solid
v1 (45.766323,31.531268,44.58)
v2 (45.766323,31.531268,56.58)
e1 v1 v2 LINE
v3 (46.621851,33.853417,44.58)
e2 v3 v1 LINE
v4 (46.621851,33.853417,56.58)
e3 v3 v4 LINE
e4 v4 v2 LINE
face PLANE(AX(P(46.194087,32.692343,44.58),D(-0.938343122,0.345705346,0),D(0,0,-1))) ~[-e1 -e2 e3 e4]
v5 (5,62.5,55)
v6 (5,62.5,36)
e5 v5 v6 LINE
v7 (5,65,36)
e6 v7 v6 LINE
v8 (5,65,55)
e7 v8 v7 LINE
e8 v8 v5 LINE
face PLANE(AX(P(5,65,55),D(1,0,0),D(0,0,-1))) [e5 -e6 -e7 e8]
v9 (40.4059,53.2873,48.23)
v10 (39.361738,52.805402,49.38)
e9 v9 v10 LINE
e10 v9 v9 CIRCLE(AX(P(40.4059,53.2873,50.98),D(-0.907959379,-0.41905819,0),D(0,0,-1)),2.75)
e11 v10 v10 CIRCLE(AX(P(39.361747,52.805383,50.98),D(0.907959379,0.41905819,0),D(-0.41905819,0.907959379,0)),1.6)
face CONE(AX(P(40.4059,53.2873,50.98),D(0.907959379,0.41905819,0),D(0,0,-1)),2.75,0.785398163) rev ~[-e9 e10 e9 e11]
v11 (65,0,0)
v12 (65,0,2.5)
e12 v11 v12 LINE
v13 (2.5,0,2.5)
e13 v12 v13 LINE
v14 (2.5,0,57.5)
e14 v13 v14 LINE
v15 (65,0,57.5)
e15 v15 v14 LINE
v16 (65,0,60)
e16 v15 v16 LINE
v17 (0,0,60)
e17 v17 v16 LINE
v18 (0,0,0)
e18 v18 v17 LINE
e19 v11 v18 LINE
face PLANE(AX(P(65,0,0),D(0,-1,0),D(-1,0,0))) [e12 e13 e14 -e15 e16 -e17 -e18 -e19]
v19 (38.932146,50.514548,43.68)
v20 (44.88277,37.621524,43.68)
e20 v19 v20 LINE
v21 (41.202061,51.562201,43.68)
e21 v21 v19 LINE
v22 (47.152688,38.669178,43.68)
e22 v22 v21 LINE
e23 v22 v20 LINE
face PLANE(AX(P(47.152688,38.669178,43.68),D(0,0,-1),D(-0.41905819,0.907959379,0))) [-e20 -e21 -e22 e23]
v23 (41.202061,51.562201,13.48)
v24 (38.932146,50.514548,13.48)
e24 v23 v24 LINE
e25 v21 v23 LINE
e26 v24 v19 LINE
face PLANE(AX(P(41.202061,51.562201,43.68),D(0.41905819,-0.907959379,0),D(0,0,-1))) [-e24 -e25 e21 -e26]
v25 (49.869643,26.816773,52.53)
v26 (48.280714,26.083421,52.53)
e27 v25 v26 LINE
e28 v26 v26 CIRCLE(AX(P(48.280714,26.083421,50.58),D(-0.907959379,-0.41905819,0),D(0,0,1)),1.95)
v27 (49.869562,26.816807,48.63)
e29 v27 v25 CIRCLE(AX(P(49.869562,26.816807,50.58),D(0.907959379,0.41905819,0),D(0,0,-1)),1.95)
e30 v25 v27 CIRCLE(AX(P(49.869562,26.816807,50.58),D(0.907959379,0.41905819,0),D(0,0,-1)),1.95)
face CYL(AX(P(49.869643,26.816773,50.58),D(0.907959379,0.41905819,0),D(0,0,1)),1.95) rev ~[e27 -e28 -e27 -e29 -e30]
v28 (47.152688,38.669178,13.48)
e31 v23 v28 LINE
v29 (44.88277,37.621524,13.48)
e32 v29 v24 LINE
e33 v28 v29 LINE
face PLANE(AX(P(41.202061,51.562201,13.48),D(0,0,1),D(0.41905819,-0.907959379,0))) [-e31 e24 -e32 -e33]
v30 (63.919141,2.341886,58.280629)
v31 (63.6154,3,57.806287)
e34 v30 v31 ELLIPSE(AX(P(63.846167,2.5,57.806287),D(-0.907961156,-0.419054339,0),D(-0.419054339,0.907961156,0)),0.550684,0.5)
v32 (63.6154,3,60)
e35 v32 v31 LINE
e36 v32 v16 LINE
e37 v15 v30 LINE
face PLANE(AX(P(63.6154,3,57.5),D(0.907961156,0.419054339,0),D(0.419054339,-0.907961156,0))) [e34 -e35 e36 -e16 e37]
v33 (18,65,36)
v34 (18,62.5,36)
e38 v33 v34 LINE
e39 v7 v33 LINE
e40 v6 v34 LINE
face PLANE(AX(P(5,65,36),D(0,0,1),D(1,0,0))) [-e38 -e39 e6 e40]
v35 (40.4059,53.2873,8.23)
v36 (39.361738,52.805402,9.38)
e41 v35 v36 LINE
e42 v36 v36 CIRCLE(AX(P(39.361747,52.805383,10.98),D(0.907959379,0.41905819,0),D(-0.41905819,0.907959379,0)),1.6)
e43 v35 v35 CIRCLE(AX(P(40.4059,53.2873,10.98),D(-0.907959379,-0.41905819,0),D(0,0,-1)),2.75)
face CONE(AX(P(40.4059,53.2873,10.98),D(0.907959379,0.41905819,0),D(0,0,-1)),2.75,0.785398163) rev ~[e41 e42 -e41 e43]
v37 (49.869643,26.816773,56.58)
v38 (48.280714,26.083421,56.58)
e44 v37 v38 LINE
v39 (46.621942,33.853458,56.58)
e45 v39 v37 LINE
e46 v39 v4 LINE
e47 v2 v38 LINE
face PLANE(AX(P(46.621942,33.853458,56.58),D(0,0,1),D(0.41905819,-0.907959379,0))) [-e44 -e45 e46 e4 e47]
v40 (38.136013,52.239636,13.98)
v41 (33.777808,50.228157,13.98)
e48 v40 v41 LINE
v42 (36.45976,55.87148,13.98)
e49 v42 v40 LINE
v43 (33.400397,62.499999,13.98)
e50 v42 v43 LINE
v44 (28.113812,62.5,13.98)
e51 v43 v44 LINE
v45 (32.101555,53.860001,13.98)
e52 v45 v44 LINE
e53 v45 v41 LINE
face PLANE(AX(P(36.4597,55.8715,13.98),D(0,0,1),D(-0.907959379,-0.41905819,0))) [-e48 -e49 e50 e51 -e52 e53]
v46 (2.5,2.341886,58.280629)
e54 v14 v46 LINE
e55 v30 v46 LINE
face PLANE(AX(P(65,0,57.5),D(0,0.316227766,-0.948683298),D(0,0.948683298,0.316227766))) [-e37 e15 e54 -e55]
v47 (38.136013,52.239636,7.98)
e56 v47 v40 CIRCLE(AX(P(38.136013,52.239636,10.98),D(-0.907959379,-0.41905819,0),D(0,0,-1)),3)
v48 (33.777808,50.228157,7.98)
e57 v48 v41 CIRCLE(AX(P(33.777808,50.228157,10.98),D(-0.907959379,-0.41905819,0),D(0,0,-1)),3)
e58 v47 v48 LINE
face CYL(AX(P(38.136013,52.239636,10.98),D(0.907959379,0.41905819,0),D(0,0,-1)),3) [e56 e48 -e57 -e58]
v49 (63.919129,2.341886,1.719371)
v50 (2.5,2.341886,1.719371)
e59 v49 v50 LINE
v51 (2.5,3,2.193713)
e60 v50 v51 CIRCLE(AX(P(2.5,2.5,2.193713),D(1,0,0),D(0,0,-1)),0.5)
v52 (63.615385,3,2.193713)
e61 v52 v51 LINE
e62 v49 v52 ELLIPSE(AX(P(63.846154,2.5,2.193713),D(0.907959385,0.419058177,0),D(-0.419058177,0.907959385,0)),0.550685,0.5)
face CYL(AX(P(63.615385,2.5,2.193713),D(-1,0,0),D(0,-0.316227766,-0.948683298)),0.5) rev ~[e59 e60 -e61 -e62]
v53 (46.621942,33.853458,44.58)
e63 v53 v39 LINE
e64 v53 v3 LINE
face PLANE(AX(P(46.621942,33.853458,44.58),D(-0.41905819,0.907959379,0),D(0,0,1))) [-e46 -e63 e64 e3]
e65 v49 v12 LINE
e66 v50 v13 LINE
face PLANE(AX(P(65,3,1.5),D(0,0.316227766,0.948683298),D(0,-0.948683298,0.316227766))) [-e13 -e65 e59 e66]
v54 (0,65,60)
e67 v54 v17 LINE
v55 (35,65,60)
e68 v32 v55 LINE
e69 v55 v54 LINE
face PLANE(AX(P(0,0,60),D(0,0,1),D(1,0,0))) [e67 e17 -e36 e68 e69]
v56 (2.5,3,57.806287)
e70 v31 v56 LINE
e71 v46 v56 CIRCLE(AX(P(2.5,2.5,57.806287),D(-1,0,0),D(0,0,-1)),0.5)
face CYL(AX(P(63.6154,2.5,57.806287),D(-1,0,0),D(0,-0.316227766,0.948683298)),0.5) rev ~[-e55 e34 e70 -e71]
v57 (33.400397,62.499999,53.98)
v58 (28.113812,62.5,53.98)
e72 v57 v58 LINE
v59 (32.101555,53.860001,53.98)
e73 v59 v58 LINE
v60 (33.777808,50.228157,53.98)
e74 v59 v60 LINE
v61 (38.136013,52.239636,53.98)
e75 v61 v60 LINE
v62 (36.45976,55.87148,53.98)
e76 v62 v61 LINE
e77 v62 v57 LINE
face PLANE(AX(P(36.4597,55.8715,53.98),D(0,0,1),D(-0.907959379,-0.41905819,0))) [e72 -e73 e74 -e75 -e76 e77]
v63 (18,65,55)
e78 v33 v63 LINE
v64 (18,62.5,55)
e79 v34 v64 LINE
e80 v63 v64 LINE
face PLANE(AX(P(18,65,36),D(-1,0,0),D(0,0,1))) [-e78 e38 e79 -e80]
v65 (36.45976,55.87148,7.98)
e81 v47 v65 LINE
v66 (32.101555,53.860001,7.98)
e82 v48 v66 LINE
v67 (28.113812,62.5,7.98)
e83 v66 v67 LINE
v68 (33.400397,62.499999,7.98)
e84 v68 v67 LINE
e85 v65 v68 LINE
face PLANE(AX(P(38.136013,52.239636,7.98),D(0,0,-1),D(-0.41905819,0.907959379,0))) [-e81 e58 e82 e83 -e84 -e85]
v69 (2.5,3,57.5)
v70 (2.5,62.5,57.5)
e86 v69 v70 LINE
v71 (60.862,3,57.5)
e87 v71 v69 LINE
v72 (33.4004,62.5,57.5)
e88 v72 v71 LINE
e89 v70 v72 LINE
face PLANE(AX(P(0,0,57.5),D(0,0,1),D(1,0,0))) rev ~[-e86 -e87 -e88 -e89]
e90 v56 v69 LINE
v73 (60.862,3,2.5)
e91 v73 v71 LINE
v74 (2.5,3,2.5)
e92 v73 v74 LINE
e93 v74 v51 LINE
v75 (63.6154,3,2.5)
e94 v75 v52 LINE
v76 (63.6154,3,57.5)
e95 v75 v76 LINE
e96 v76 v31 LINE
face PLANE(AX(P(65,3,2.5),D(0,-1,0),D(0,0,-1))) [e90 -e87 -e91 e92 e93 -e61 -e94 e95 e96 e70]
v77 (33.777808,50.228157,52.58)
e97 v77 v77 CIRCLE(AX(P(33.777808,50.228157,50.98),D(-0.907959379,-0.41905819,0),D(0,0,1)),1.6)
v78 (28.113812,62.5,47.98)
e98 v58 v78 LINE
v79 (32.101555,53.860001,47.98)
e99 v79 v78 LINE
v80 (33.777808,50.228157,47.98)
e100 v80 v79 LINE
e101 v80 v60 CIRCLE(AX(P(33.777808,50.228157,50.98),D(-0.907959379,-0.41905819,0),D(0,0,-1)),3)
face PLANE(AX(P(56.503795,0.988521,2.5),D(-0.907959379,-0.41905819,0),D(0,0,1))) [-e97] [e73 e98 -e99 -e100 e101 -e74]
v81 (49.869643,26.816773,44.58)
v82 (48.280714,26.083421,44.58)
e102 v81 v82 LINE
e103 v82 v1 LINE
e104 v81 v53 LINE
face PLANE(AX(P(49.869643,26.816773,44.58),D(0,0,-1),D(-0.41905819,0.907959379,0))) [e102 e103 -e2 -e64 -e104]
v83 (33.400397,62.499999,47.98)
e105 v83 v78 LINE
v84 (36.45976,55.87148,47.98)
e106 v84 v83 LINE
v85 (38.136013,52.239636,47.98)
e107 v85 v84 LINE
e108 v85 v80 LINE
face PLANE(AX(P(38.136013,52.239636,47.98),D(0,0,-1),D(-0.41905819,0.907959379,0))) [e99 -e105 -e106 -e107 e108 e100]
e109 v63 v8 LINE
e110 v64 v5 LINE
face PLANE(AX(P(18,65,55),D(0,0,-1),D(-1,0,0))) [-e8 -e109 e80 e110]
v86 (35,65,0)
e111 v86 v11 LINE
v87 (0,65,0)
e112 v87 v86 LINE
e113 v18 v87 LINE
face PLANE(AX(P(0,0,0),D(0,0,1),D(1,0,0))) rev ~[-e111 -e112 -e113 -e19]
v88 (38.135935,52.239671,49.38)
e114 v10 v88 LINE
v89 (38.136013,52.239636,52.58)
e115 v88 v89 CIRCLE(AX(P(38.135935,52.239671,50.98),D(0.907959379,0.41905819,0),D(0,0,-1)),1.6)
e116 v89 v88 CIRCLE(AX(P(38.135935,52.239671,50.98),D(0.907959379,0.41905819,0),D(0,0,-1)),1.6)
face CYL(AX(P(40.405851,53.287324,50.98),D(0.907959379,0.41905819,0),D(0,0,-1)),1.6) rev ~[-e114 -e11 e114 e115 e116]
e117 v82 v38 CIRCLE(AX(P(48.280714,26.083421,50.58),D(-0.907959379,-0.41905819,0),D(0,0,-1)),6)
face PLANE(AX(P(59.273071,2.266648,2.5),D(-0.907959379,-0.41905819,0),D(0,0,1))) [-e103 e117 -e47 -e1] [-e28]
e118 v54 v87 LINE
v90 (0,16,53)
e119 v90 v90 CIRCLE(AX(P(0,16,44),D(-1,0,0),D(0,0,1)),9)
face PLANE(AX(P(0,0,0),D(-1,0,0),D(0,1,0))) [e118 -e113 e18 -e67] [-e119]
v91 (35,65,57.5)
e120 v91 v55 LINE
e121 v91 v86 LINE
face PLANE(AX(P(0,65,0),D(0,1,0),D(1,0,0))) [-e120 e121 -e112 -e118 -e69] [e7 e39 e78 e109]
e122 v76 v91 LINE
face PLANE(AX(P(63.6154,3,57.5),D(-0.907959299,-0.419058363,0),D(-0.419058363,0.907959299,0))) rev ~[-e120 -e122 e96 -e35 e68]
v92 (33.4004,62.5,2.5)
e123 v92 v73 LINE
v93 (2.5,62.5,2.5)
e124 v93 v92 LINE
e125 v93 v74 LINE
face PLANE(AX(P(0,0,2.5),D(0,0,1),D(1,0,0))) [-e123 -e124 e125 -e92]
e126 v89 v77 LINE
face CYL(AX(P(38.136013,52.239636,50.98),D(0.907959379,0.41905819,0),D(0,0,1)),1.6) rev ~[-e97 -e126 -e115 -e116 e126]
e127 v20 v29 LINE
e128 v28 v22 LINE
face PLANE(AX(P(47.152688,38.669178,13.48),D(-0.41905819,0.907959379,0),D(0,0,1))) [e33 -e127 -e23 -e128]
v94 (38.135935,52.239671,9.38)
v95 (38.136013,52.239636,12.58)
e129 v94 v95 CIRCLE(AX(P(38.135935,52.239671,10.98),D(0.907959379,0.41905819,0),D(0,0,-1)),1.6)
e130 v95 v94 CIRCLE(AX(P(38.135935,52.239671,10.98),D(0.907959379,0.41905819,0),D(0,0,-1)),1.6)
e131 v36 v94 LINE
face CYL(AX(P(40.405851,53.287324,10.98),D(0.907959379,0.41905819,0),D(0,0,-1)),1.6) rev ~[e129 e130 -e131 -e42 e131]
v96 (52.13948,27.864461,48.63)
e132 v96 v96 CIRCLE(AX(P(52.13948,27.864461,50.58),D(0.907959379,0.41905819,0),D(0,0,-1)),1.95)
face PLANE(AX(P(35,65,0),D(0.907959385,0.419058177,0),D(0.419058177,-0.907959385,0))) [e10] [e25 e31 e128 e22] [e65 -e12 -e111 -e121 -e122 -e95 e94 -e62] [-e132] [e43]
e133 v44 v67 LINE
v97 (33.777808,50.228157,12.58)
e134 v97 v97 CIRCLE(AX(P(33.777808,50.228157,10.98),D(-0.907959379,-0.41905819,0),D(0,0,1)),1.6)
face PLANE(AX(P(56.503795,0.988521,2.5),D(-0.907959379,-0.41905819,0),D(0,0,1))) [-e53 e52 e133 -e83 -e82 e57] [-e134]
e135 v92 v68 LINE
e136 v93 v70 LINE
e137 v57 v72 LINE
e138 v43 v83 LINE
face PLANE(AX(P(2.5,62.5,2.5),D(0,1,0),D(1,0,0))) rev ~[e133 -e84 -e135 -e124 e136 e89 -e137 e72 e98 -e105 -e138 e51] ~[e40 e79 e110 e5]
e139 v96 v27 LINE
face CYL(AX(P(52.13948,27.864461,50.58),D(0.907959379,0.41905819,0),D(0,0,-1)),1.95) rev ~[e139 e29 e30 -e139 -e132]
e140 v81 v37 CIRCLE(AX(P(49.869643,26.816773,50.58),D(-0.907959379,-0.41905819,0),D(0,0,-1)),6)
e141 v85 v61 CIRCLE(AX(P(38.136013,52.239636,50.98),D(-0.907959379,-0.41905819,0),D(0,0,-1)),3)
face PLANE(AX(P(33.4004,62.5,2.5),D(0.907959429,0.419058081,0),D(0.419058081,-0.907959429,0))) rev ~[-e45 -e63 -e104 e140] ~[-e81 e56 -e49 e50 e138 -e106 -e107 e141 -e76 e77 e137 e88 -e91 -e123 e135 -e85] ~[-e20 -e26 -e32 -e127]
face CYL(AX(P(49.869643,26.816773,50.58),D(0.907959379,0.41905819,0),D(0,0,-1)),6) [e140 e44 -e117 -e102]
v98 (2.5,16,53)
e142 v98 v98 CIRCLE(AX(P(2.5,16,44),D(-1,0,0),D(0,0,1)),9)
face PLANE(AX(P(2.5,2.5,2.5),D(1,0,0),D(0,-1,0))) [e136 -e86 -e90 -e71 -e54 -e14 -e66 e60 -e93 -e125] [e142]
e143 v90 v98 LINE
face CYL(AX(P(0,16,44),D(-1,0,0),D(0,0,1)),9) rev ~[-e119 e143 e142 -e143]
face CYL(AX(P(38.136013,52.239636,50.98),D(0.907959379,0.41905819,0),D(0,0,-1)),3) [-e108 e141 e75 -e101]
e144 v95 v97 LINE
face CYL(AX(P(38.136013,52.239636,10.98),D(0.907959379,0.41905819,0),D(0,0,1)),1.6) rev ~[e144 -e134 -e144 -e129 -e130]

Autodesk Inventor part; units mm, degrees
ref_plane "YZ Plane" through (0, 0, 0) normal (1, 0, 0) x (0, 1, 0)
ref_plane "XZ Plane" through (0, 0, 0) normal (0, 1, 0) x (-1, 0, 0)
sketch "Sketch1" plane through (0, 0, 0) normal (0, 0, 1) x (1, 0, 0)
  line L0 (0, 0) -> (0, 65)
  line L1 (0, 65) -> (35, 65)
  line L2 (35, 65) -> (65, 0)
  line L3 (65, 0) -> (0, 0)
  line L4 (35, 65) -> (19.5647, 57.876) construction
  line L5 (19.5647, 57.876) -> (40.0985, 13.386) construction
  line L6 (40.0985, 13.386) -> (55.5339, 20.51) construction
  line L7 (5, 65) -> (5, 39) construction
  line L8 (5, 39) -> (17.8, 39) construction
  line L9 (17.8, 39) -> (17.8, 65) construction
  line L10 (0, 23.6) -> (40, 23.6) construction
  line L11 (40, 23.6) -> (40, 6) construction
  line L12 (40, 6) -> (0, 6) construction
  line L13 (0, 26.5) -> (11, 26.5) construction
  line L14 (11, 26.5) -> (11, 23.6) construction
  line L15 (11, 6) -> (11, 3.1) construction
  line L16 (11, 3.1) -> (0, 3.1) construction
  dimension "d27" = 17
  dimension "d28" = 12.8
  dimension "d29" = 5
  dimension "d31" = 40
  dimension "d32" = 17.6
  dimension "d33" = 26
  dimension "d34" = 35
  dimension "d35" = 65
  dimension "d36" = 23.4
  dimension "d37" = 11
  dimension "d38" = 49
  dimension "d39" = 65
  dimension "d40" = 6
extrude "Extrusion1" add sketch "Sketch1" along normal blind 2.5
sketch "Sketch2" plane through (0, 0, 2.5) normal (0, 0, 1) x (1, 0, 0)
  line L0 (0, 65) -> (0, 0) projected
  line L1 (0, 0) -> (65, 0) projected
  line L2 (65, 0) -> (35, 65) projected
  line L3 (35, 65) -> (0, 65) projected
  line L4 (2.5, 2.5) -> (2.5, 62.5)
  line L5 (2.5, 62.5) -> (33.4004, 62.5)
  line L6 (33.4004, 62.5) -> (61.0927, 2.5)
  line L7 (61.0927, 2.5) -> (2.5, 2.5)
  line L8 (2.5, 2.5) -> (2.5, 0)
  line L9 (60.862, 3) -> (63.6154, 3)
  dimension "d2" = 2.5
  dimension "d3" = 3
extrude "Extrusion2" add sketch "Sketch2" along normal blind 55 contours L3 L2 L9 L6 L5 L4 L8 L1 L0
sketch "Sketch3" plane through (0, 0, 57.5) normal (0, 0, 1) x (1, 0, 0)
  line L0 (0, 65) -> (0, 0) projected
  line L1 (0, 0) -> (2.5, 0) projected
  line L2 (2.5, 0) -> (2.5, 62.5) projected
  line L3 (2.5, 62.5) -> (33.4004, 62.5) projected
  line L4 (33.4004, 62.5) -> (60.862, 3) projected
  line L5 (60.862, 3) -> (63.6154, 3) projected
  line L6 (63.6154, 3) -> (35, 65) projected
  line L7 (35, 65) -> (0, 65) projected
  line L8 (63.6154, 3) -> (65, 0)
  line L9 (65, 0) -> (2.5, 0)
extrude "Extrusion3" add sketch "Sketch3" along normal blind 2.5
sketch "Sketch4" plane through (0, 65, 0) normal (0, 1, 0) x (1, 0, 0)
  line L0 (5, -36) -> (18, -36)
  line L1 (18, -36) -> (18, -55)
  line L2 (18, -55) -> (5, -55)
  line L3 (5, -55) -> (5, -36)
  line L4 (0, 0) -> (0, -60) projected
  line L5 (35, -60) -> (0, -60) projected
  line L6 (4.1, -35.1) -> (18.9, -35.1) construction
  line L7 (18.9, -35.1) -> (18.9, -55.9) construction
  line L8 (18.9, -55.9) -> (4.1, -55.9) construction
  line L9 (4.1, -55.9) -> (4.1, -35.1) construction
  line L10 (5, -45.5) -> (4.1, -45.5) construction
  line L11 (18, -45.5) -> (18.9, -45.5) construction
  line L12 (11.5, -36) -> (11.5, -35.1) construction
  line L13 (11.5, -55) -> (11.5, -55.9) construction
  dimension "d41" = 13
  dimension "d42" = 19
  dimension "d43" = 14.8
  dimension "d44" = 20.8
  dimension "d45" = 5
  dimension "d46" = 5
extrude "Extrusion4" cut sketch "Sketch4" against normal through all
sketch "Sketch5" plane through (35, 65, 60) normal (0.9079594, 0.4190582, 0) x (0, 0, -1)
  line L0 (16.32, -14.8) -> (46.52, -14.8)
  line L1 (46.52, -14.8) -> (46.52, -29)
  line L2 (46.52, -29) -> (16.32, -29)
  line L3 (16.32, -29) -> (16.32, -14.8)
  circle A0 centre (9.42, -40.9) radius 1.95
  line L4 (60, -71.5891) -> (57.5, -71.5891) projected
  circle A1 centre (49.02, -12.9) radius 1.6
  circle A2 centre (9.02, -12.9) radius 1.6
  line L5 (9.02, -12.9) -> (49.02, -12.9) construction
  line L6 (60, 0) -> (0, 0) projected
  line L7 (3.5, -10) -> (53.82, -10) construction
  line L8 (53.82, -10) -> (53.82, -59.3) construction
  line L9 (53.82, -59.3) -> (3.5, -59.3) construction
  line L10 (3.5, -59.3) -> (3.5, -10) construction
  line L11 (0, -71.5891) -> (0, 0) projected
  point P0 (60, -44.3503)
  dimension "d17" = 40
  dimension "d18" = 3.2
  dimension "d19" = 30.2
  dimension "d20" = 14.2
  dimension "d47" = 2.5
  dimension "d48" = 1.9
  dimension "d49" = 28
  dimension "d50" = 39.6
  dimension "d51" = 50.32
  dimension "d52" = 4.8
  dimension "d53" = 49.3
  dimension "d54" = 2.9
  dimension "d55" = 10
  dimension "d72" = 3.5
  dimension "d73" = 3.9
extrude "Extrusion5" cut sketch "Sketch5" against normal up to next
sketch "Sketch6" plane through (0, 0, 0) normal (-1, 0, 0) x (0, 0, 1)
  circle A0 centre (44, 16) radius 9
  line L0 (0, 0) -> (60, 0) projected
  line L1 (60, 65) -> (60, 0) projected
  dimension "d56" = 18
  dimension "d57" = 7
  dimension "d58" = 7
extrude "Extrusion6" cut sketch "Sketch6" against normal up to next
ref_plane "Work Plane1" through (65, 0, 57.5) normal (1, 0, 0) x (0, 0, -1)
sketch "Sketch7" plane through (65, 0, 57.5) normal (1, 0, 0) x (0, 0, -1)
  line L0 (57.5, 65) -> (57.5, 0) projected
  line L1 (57.5, 65) -> (-2.5, 65) projected
  line L2 (-2.5, 0) -> (-2.5, 65) projected
  line L3 (0, 0) -> (-2.5, 0) projected
  line L4 (0, 0) -> (0, 3) projected
  line L5 (55, 3) -> (0, 3) projected
  line L6 (55, 0) -> (55, 3) projected
  line L7 (57.5, 0) -> (55, 0) projected
  line L8 (13.82, 38.6692) -> (13.82, 51.5622) projected
  line L9 (13.82, 51.5622) -> (44.02, 51.5622) projected
  line L10 (44.02, 51.5622) -> (44.02, 38.6692) projected
  line L11 (44.02, 38.6692) -> (13.82, 38.6692) projected
  ellipse E0 centre (6.92, 27.8645) end of major axis (4.97, 27.8645) minor radius 1.7705 projected
  line L12 (0, 0) -> (-1, 3)
  line L13 (-1, 3) -> (0, 3)
  line L14 (55, 3) -> (56, 3)
  line L15 (56, 3) -> (55, 0)
  dimension "d59" = 1
extrude "Extrusion7" cut sketch "Sketch7" against normal up to surface (62.5 mm away) contours L6 L14 L15 | L12 L13 L4
fillet "Fillet1" radius 0.5 2 edges at (33.0577, 3, 58.5) (33.0577, 3, 1.5)
sketch "Sketch8" plane through (60.862, 3, 2.5) normal (-0.9079594, -0.4190582, 0) x (0, 0, 1)
  circle A0 centre (8.48, 54.2311) radius 1.6 projected
  circle A1 centre (48.48, 54.2311) radius 1.6 projected
  arc A2 (45.48, 54.2311) -> (51.48, 54.2311) centre (48.48, 54.2311) ccw
  line L0 (10.98, 52.3311) -> (41.18, 52.3311) projected
  line L1 (5.48, 54.2311) -> (5.48, 58.2311)
  line L2 (11.48, 58.2311) -> (11.48, 54.2311)
  line L3 (45.48, 54.2311) -> (45.48, 58.2311)
  line L4 (51.48, 58.2311) -> (51.48, 54.2311)
  line L5 (0, 65.5316) -> (55, 65.5316) projected
  arc A3 (5.48, 54.2311) -> (11.48, 54.2311) centre (8.48, 54.2311) ccw
  line L6 (5.48, 58.2311) -> (11.48, 58.2311)
  line L7 (45.48, 58.2311) -> (51.48, 58.2311)
  point P0 (-2.5, 22.7808)
  point P1 (6.9, 65.5316)
  point P2 (12.9, 65.5316)
  point P3 (46.9, 65.5316)
  point P4 (52.9, 65.5316)
  dimension "d60" = 3
  dimension "d61" = 4
extrude "Extrusion8" add sketch "Sketch8" along normal blind 4.8
sketch "Sketch12" plane through (36.4597, 55.8715, 53.98) normal (-0.4190582, 0.9079594, 0) x (0.9079594, 0.4190582, 0)
  line L0 (0, 6) -> (0, 0) projected
  line L1 (0, 6) -> (-4.8, 6) projected
  line L2 (-4.8, 0) -> (-4.8, 6) projected
  line L3 (0, 0) -> (-4.8, 0) projected
  line L4 (0, 46) -> (0, 40) projected
  line L5 (0, 46) -> (-4.8, 46) projected
  line L6 (-4.8, 40) -> (-4.8, 46) projected
  line L7 (0, 40) -> (-4.8, 40) projected
  point P0 (-56.5174, 53.98)
extrude "Extrusion11" add sketch "Sketch12" along normal up to next
sketch "Sketch13" plane through (35, 65, 60) normal (0.9079594, 0.4190582, 0) x (0, 0, -1)
  circle A0 centre (49.02, -12.9) radius 1.6 projected
  circle A1 centre (9.02, -12.9) radius 1.6 projected
  point P0 (60, -44.3503)
hole "Hole1" at (40.4059, 53.2873, 50.98) at (40.4059, 53.2873, 10.98) direction (-0.9079594, -0.4190582, 0) diameter 3 depth 20 tip angle 118 countersink diameter 5.5 countersink angle 90
sketch "Sketch14" plane through (60.862, 3, 2.5) normal (-0.9079594, -0.4190582, 0) x (0, 0, 1)
  line L0 (55, 65.5316) -> (55, 0) projected
  line L1 (10.98, 52.3311) -> (41.18, 52.3311) projected
  circle A0 centre (48.08, 26.2311) radius 1.95 projected
  arc A1 (42.08, 26.2311) -> (54.08, 26.2311) centre (48.08, 26.2311) ccw
  line L2 (42.08, 26.2311) -> (42.08, 33.9811)
  line L3 (42.08, 33.9811) -> (54.08, 33.9811)
  line L4 (54.08, 33.9811) -> (54.08, 26.2311)
  arc A2 (54.08, 26.2311) -> (42.08, 26.2311) centre (48.08, 26.2311) ccw construction
  point P0 (-2.5, 22.7808)
  dimension "d71" = 12
  dimension "d80" = 1.75
extrude "Extrusion12" add sketch "Sketch14" along normal blind 1.75
chamfer "Chamfer1" distance 1.75 angle 45 1 edges at (45.033, 33.1201, 50.58)
properties part number "Caja temporizador"
